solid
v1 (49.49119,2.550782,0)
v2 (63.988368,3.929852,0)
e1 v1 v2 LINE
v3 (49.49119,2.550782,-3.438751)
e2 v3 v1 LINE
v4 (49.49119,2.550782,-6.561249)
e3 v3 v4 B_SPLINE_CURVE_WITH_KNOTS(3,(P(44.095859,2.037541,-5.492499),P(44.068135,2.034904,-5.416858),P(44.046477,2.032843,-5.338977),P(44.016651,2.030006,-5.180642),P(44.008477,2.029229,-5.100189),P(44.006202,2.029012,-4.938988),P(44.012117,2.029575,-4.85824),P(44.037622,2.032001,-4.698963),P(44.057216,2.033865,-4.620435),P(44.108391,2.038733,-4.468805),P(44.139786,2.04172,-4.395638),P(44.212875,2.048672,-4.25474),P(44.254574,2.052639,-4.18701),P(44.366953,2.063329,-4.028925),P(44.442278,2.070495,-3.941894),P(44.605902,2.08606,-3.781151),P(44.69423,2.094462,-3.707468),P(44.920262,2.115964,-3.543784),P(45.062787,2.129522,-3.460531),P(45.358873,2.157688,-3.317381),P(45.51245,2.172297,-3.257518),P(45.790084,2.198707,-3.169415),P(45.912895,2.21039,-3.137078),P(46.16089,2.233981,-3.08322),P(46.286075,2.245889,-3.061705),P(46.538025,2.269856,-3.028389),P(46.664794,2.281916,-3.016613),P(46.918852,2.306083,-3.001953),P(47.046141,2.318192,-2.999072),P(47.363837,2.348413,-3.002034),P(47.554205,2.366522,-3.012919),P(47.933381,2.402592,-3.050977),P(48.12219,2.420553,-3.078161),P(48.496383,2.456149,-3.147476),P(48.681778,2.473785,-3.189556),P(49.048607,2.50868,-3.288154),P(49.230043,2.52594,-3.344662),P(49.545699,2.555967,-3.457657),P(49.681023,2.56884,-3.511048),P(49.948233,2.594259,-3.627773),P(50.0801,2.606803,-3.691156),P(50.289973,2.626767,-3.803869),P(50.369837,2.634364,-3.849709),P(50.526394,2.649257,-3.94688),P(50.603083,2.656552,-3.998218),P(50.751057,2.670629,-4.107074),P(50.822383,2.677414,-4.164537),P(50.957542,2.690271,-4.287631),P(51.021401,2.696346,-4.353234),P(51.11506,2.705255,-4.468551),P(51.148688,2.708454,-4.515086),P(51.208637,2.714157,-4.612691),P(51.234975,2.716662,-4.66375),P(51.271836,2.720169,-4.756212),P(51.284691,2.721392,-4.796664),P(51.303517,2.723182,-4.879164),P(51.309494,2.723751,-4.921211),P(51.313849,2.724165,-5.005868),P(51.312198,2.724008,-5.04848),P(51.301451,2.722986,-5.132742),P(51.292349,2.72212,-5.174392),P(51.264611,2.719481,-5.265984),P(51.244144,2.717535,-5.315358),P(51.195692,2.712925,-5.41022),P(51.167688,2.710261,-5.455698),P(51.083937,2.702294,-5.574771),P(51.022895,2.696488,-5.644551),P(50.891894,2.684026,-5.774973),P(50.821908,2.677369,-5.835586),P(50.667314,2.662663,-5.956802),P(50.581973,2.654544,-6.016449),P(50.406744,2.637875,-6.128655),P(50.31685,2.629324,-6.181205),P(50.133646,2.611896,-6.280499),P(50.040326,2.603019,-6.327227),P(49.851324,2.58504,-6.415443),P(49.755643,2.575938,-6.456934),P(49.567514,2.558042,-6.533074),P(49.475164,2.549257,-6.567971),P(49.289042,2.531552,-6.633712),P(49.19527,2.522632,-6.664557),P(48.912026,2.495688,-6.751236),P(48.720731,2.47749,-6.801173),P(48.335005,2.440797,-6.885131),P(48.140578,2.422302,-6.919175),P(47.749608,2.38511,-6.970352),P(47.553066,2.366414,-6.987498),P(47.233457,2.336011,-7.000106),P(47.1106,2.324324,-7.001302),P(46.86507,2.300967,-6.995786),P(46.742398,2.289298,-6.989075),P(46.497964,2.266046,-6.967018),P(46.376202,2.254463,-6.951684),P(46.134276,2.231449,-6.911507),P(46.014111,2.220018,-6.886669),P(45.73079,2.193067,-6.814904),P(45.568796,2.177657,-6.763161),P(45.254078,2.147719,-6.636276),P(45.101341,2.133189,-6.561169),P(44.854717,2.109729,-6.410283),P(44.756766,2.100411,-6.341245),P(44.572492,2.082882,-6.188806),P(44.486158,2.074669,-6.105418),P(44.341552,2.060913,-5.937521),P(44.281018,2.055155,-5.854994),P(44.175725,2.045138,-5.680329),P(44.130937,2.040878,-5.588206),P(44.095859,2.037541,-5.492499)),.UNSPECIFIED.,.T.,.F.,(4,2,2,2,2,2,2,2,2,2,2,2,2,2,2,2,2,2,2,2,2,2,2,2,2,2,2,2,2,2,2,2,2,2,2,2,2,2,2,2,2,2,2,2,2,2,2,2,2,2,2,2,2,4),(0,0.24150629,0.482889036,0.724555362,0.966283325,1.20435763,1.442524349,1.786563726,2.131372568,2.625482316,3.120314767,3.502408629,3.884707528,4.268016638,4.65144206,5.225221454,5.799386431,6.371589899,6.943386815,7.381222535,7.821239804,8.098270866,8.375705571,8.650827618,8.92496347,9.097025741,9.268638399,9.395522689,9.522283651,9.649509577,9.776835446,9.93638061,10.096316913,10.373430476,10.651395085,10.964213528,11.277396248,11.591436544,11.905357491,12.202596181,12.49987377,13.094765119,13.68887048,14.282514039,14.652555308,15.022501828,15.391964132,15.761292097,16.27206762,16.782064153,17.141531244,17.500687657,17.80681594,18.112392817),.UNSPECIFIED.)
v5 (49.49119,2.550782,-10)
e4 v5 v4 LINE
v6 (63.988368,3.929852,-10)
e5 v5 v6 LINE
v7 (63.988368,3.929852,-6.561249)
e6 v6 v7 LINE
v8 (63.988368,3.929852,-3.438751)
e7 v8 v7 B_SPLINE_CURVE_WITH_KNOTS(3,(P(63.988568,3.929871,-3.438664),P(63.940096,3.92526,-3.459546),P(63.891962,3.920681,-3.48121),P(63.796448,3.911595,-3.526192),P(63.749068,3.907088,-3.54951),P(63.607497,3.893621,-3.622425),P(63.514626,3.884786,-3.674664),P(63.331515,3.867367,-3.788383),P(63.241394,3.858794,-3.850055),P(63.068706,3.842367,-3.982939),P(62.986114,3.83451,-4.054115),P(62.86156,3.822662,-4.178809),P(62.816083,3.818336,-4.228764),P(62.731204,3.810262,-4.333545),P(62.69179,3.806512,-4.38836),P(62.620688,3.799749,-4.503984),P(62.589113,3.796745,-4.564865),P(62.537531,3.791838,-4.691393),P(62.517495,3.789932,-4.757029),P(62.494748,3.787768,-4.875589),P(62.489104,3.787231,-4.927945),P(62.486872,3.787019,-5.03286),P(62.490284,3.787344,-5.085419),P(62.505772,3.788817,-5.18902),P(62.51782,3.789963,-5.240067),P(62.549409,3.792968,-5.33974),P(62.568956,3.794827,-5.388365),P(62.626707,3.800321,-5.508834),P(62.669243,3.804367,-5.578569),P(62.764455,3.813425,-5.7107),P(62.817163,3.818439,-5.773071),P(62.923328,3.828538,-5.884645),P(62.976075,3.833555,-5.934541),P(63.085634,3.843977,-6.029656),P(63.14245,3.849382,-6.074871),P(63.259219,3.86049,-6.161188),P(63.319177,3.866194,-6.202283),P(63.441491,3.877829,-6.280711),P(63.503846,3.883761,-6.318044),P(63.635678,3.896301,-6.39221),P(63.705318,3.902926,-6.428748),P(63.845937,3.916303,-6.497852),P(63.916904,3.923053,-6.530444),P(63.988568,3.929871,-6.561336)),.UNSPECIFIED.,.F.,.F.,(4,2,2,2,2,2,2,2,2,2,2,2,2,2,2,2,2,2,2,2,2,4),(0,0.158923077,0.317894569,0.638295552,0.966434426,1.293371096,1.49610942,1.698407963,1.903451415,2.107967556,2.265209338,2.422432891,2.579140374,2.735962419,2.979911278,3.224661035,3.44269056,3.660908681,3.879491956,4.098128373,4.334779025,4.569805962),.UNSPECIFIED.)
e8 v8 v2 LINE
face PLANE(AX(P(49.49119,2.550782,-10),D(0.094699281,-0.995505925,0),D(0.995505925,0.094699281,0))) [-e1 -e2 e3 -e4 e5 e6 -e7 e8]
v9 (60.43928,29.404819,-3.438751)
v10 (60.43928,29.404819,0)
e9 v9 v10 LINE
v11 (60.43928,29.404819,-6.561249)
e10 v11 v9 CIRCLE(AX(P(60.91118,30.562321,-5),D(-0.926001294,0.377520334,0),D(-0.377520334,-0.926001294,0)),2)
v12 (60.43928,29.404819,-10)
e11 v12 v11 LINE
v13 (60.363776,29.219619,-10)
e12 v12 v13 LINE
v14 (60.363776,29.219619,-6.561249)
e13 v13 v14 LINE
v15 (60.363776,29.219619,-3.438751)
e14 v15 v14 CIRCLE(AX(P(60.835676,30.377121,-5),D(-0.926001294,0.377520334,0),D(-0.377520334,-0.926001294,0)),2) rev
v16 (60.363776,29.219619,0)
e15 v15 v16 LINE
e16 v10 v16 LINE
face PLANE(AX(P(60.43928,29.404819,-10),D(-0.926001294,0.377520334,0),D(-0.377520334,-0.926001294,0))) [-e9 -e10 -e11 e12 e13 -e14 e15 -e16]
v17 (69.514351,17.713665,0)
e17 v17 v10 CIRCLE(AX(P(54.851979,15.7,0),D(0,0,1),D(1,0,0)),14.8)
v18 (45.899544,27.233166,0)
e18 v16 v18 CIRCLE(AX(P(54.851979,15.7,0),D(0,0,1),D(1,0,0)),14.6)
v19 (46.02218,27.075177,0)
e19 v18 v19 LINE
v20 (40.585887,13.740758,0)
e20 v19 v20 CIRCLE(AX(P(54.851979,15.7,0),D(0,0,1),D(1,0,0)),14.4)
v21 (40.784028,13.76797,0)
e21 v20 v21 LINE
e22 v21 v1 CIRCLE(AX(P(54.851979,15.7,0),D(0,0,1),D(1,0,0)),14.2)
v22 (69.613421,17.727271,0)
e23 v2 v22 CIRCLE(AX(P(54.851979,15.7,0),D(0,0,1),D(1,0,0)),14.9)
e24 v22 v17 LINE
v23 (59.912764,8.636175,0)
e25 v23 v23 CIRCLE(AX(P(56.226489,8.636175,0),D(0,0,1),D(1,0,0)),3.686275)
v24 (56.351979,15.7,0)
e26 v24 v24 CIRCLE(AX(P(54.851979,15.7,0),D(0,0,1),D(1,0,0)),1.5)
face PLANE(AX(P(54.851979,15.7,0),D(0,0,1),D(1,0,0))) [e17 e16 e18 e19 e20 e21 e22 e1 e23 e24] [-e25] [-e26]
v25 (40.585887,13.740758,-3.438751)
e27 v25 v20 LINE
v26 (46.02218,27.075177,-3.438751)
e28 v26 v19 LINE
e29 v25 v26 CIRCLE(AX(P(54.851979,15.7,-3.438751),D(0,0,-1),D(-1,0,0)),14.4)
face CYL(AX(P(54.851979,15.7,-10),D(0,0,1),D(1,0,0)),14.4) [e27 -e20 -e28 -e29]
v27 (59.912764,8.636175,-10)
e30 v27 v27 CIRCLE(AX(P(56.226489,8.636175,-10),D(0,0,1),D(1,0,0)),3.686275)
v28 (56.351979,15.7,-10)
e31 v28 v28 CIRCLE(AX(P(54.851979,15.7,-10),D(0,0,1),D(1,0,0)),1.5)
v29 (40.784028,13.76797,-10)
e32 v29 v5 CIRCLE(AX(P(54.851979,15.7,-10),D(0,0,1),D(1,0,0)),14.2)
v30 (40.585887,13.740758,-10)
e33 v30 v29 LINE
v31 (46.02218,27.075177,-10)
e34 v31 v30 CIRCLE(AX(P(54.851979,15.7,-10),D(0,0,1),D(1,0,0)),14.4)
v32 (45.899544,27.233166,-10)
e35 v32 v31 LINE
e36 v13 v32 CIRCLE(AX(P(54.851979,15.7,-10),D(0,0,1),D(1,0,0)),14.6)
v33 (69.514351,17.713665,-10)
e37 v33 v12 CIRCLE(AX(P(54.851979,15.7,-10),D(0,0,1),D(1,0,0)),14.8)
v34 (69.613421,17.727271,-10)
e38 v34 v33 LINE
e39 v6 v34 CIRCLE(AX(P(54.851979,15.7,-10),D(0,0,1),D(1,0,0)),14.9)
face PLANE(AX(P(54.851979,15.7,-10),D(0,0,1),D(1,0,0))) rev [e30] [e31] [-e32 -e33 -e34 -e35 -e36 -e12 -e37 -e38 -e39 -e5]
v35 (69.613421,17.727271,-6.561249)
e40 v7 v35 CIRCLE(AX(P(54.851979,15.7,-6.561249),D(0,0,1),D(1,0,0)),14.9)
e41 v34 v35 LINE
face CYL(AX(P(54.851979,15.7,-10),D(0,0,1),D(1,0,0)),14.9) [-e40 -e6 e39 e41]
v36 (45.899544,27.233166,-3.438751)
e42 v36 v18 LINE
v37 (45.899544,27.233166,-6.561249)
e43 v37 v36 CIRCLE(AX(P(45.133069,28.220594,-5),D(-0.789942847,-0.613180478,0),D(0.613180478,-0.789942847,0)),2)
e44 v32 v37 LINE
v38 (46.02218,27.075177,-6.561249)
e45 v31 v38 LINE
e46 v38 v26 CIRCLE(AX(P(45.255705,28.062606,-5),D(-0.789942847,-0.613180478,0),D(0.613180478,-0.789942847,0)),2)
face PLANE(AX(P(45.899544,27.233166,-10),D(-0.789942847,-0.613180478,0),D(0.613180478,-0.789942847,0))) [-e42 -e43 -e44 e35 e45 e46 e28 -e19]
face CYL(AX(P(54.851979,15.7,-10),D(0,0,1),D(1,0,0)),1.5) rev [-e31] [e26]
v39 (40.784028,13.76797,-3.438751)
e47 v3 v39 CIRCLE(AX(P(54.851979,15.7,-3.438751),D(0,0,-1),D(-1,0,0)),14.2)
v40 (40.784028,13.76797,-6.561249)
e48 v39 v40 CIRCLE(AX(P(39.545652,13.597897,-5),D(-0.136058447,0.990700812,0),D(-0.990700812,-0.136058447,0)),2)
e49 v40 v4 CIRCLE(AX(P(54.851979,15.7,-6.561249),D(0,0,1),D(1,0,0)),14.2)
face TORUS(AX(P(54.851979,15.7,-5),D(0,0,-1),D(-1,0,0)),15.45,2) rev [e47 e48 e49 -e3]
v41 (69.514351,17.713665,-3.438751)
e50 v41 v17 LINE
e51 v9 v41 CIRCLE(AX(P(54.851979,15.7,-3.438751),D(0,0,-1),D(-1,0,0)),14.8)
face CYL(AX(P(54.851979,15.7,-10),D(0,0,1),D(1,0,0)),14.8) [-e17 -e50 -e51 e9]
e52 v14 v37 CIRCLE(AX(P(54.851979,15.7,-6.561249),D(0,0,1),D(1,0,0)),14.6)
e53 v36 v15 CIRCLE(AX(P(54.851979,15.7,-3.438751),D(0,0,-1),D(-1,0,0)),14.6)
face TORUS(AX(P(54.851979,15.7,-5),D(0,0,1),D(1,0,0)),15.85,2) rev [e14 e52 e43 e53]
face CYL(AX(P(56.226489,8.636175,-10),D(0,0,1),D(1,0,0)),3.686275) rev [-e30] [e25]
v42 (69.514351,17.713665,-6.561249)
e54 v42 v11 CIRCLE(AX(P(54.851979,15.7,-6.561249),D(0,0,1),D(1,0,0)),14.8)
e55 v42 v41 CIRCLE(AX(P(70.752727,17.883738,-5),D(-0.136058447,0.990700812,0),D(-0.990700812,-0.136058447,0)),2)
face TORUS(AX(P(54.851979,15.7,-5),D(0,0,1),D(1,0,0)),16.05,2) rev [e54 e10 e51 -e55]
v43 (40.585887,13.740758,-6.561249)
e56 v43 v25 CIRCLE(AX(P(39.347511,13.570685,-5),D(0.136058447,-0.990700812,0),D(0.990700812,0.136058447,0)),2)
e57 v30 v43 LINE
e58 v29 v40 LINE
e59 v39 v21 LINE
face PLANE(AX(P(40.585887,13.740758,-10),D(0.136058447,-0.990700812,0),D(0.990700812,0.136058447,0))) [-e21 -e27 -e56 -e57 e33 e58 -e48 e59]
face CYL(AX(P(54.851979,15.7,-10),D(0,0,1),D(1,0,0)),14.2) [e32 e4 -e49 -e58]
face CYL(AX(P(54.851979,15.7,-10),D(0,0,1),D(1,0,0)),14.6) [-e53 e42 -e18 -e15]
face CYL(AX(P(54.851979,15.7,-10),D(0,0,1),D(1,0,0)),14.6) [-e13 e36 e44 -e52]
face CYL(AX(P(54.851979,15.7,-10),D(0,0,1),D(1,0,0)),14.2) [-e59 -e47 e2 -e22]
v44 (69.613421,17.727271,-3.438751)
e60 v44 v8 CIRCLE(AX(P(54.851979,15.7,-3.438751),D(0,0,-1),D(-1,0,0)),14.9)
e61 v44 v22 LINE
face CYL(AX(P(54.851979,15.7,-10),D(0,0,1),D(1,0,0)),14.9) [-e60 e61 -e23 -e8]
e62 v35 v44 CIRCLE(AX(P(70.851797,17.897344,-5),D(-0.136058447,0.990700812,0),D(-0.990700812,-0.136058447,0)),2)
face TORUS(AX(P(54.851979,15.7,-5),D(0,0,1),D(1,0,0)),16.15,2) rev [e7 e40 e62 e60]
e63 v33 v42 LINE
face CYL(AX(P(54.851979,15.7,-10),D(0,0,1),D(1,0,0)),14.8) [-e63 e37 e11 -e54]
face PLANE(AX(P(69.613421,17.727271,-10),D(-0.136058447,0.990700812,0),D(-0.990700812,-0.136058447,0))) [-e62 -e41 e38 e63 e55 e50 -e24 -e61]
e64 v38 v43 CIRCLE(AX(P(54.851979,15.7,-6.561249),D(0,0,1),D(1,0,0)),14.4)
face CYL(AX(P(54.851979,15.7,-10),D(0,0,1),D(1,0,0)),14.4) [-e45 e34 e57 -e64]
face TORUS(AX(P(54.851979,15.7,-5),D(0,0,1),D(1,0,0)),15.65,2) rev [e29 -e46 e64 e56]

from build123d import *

# Parameters (mm, degrees)
SKETCH1_R           = 3.686275202
SKETCH1_R_2         = 1.5
BOSS_EXTRUDE1_DEPTH = 10
CUT_SWEEP1_ANGLE    = 65.162978
SKETCH3_R           = 2
SKETCH4_R           = 2
SKETCH5_R           = 2
CUT_SWEEP5_ANGLE    = 66.926183


# Read off the part's stored shape, not the designer's step: Cut-Sweep1, Cut-Sweep5
with BuildPart() as part:
    # Sketch1 → Boss-Extrude1 (new body)
    with BuildSketch(Plane.XY):
        with BuildLine():
            Line((49.491190341, 2.55078162), (63.988368206, 3.929851578))
            ThreePointArc((63.988368206, 3.929851578), (68.649398374, 10.07494702), (69.613421186, 17.727270865))
            Line((69.613421186, 17.727270865), (69.514351105, 17.71366502))
            ThreePointArc((69.514351105, 17.71366502), (66.543133225, 24.775071071), (60.439280034, 29.404819157))
            Line((60.439280034, 29.404819157), (60.363775967, 29.219618898))
            ThreePointArc((60.363775967, 29.219618898), (52.865525757, 30.164231855), (45.899544112, 27.233165568))
            Line((45.899544112, 27.233165568), (46.022180208, 27.075176998))
            ThreePointArc((46.022180208, 27.075176998), (41.517560448, 21.136292813), (40.585887394, 13.740758359))
            Line((40.585887394, 13.740758359), (40.784027557, 13.767970048))
            ThreePointArc((40.784027557, 13.767970048), (43.634790659, 6.992837216), (49.491190341, 2.55078162))
        make_face()
        with Locations((56.226488574, 8.636175254)):
            Circle(SKETCH1_R, mode=Mode.SUBTRACT)
        with Locations((54.851979087, 15.7)):
            Circle(SKETCH1_R_2, mode=Mode.SUBTRACT)
    extrude(amount=-BOSS_EXTRUDE1_DEPTH)

    # Cut-Sweep1 outline → Cut-Sweep1 (revolve, cut)
    with BuildSketch(Plane(origin=(54.851979087, 15.7, 0), x_dir=(0.5396064408716191, -0.8419173884472655, 0), z_dir=(-0.8419173884472655, -0.5396064408716191, 0))):
        with BuildLine():
            Line((14.9, -6.5612495), (14.9, -3.4387505))
            ThreePointArc((14.9, -3.4387505), (14.15, -5), (14.9, -6.5612495))
        make_face()
    revolve(axis=Axis((54.851979087, 15.7, 0), (0, 0, 1)), revolution_arc=CUT_SWEEP1_ANGLE, mode=Mode.SUBTRACT)

    # Cut-Sweep2: sweep along a curve in space
    with BuildLine() as cut_sweep2_path:
        ThreePointArc((69.514351105, 17.71366502, 0), (66.543133225, 24.775071071, 0), (60.439280034, 29.404819157, 0))
    # Sketch3 → Cut-Sweep2 (sweep, cut)
    with BuildSketch(Plane(origin=(41.545913318, -16.937802546, 0), x_dir=(0, 0, 1), z_dir=(-0.9260012944005722, 0.37752033424501136, 0))):
        with Locations((-5, 51.295957801)):
            Circle(SKETCH3_R)
    sweep(path=cut_sweep2_path.line, mode=Mode.SUBTRACT)

    # Cut-Sweep3: sweep along a curve in space
    with BuildLine() as cut_sweep3_path:
        ThreePointArc((60.363775967, 29.219618898, 0), (52.865525757, 30.164231855, 0), (45.899544112, 27.233165568, 0))
    # Sketch4 → Cut-Sweep3 (sweep, cut)
    with BuildSketch(Plane(origin=(41.832894366, 32.472113961, 0), x_dir=(0, 0, 1), z_dir=(-0.7899428471017035, -0.6131804777656041, 0))):
        with Locations((-5, -5.382060044)):
            Circle(SKETCH4_R)
    sweep(path=cut_sweep3_path.line, mode=Mode.SUBTRACT)

    # Cut-Sweep4: sweep along a curve in space
    with BuildLine() as cut_sweep4_path:
        ThreePointArc((46.022180208, 27.075176998, 0), (41.517560448, 21.136292813, 0), (40.585887394, 13.740758359, 0))
    # Sketch5 → Cut-Sweep4 (sweep, cut)
    with BuildSketch(Plane(origin=(-1.100839052, 8.015688586, 0), x_dir=(0.9907008120106874, 0.13605844729881716, 0), z_dir=(0.13605844729881716, -0.9907008120106874, 0))):
        with Locations((40.828017845, -5)):
            Circle(SKETCH5_R)
    sweep(path=cut_sweep4_path.line, mode=Mode.SUBTRACT)

    # Cut-Sweep5 outline → Cut-Sweep5 (revolve, cut)
    with BuildSketch(Plane(origin=(54.851979087, 15.7, 0), x_dir=(-0.9907008120106691, -0.13605844729894895, 0), z_dir=(-0.13605844729894895, 0.9907008120106691, 0))):
        with BuildLine():
            ThreePointArc((14.20000016, -3.438750372), (13.45, -5.000000221), (14.200000505, -6.561249904))
            Line((14.200000505, -6.561249904), (14.20000016, -3.438750372))
        make_face()
    revolve(axis=Axis((54.851979087, 15.7, 0), (0, 0, 1)), revolution_arc=CUT_SWEEP5_ANGLE, mode=Mode.SUBTRACT)


solid = part.part
